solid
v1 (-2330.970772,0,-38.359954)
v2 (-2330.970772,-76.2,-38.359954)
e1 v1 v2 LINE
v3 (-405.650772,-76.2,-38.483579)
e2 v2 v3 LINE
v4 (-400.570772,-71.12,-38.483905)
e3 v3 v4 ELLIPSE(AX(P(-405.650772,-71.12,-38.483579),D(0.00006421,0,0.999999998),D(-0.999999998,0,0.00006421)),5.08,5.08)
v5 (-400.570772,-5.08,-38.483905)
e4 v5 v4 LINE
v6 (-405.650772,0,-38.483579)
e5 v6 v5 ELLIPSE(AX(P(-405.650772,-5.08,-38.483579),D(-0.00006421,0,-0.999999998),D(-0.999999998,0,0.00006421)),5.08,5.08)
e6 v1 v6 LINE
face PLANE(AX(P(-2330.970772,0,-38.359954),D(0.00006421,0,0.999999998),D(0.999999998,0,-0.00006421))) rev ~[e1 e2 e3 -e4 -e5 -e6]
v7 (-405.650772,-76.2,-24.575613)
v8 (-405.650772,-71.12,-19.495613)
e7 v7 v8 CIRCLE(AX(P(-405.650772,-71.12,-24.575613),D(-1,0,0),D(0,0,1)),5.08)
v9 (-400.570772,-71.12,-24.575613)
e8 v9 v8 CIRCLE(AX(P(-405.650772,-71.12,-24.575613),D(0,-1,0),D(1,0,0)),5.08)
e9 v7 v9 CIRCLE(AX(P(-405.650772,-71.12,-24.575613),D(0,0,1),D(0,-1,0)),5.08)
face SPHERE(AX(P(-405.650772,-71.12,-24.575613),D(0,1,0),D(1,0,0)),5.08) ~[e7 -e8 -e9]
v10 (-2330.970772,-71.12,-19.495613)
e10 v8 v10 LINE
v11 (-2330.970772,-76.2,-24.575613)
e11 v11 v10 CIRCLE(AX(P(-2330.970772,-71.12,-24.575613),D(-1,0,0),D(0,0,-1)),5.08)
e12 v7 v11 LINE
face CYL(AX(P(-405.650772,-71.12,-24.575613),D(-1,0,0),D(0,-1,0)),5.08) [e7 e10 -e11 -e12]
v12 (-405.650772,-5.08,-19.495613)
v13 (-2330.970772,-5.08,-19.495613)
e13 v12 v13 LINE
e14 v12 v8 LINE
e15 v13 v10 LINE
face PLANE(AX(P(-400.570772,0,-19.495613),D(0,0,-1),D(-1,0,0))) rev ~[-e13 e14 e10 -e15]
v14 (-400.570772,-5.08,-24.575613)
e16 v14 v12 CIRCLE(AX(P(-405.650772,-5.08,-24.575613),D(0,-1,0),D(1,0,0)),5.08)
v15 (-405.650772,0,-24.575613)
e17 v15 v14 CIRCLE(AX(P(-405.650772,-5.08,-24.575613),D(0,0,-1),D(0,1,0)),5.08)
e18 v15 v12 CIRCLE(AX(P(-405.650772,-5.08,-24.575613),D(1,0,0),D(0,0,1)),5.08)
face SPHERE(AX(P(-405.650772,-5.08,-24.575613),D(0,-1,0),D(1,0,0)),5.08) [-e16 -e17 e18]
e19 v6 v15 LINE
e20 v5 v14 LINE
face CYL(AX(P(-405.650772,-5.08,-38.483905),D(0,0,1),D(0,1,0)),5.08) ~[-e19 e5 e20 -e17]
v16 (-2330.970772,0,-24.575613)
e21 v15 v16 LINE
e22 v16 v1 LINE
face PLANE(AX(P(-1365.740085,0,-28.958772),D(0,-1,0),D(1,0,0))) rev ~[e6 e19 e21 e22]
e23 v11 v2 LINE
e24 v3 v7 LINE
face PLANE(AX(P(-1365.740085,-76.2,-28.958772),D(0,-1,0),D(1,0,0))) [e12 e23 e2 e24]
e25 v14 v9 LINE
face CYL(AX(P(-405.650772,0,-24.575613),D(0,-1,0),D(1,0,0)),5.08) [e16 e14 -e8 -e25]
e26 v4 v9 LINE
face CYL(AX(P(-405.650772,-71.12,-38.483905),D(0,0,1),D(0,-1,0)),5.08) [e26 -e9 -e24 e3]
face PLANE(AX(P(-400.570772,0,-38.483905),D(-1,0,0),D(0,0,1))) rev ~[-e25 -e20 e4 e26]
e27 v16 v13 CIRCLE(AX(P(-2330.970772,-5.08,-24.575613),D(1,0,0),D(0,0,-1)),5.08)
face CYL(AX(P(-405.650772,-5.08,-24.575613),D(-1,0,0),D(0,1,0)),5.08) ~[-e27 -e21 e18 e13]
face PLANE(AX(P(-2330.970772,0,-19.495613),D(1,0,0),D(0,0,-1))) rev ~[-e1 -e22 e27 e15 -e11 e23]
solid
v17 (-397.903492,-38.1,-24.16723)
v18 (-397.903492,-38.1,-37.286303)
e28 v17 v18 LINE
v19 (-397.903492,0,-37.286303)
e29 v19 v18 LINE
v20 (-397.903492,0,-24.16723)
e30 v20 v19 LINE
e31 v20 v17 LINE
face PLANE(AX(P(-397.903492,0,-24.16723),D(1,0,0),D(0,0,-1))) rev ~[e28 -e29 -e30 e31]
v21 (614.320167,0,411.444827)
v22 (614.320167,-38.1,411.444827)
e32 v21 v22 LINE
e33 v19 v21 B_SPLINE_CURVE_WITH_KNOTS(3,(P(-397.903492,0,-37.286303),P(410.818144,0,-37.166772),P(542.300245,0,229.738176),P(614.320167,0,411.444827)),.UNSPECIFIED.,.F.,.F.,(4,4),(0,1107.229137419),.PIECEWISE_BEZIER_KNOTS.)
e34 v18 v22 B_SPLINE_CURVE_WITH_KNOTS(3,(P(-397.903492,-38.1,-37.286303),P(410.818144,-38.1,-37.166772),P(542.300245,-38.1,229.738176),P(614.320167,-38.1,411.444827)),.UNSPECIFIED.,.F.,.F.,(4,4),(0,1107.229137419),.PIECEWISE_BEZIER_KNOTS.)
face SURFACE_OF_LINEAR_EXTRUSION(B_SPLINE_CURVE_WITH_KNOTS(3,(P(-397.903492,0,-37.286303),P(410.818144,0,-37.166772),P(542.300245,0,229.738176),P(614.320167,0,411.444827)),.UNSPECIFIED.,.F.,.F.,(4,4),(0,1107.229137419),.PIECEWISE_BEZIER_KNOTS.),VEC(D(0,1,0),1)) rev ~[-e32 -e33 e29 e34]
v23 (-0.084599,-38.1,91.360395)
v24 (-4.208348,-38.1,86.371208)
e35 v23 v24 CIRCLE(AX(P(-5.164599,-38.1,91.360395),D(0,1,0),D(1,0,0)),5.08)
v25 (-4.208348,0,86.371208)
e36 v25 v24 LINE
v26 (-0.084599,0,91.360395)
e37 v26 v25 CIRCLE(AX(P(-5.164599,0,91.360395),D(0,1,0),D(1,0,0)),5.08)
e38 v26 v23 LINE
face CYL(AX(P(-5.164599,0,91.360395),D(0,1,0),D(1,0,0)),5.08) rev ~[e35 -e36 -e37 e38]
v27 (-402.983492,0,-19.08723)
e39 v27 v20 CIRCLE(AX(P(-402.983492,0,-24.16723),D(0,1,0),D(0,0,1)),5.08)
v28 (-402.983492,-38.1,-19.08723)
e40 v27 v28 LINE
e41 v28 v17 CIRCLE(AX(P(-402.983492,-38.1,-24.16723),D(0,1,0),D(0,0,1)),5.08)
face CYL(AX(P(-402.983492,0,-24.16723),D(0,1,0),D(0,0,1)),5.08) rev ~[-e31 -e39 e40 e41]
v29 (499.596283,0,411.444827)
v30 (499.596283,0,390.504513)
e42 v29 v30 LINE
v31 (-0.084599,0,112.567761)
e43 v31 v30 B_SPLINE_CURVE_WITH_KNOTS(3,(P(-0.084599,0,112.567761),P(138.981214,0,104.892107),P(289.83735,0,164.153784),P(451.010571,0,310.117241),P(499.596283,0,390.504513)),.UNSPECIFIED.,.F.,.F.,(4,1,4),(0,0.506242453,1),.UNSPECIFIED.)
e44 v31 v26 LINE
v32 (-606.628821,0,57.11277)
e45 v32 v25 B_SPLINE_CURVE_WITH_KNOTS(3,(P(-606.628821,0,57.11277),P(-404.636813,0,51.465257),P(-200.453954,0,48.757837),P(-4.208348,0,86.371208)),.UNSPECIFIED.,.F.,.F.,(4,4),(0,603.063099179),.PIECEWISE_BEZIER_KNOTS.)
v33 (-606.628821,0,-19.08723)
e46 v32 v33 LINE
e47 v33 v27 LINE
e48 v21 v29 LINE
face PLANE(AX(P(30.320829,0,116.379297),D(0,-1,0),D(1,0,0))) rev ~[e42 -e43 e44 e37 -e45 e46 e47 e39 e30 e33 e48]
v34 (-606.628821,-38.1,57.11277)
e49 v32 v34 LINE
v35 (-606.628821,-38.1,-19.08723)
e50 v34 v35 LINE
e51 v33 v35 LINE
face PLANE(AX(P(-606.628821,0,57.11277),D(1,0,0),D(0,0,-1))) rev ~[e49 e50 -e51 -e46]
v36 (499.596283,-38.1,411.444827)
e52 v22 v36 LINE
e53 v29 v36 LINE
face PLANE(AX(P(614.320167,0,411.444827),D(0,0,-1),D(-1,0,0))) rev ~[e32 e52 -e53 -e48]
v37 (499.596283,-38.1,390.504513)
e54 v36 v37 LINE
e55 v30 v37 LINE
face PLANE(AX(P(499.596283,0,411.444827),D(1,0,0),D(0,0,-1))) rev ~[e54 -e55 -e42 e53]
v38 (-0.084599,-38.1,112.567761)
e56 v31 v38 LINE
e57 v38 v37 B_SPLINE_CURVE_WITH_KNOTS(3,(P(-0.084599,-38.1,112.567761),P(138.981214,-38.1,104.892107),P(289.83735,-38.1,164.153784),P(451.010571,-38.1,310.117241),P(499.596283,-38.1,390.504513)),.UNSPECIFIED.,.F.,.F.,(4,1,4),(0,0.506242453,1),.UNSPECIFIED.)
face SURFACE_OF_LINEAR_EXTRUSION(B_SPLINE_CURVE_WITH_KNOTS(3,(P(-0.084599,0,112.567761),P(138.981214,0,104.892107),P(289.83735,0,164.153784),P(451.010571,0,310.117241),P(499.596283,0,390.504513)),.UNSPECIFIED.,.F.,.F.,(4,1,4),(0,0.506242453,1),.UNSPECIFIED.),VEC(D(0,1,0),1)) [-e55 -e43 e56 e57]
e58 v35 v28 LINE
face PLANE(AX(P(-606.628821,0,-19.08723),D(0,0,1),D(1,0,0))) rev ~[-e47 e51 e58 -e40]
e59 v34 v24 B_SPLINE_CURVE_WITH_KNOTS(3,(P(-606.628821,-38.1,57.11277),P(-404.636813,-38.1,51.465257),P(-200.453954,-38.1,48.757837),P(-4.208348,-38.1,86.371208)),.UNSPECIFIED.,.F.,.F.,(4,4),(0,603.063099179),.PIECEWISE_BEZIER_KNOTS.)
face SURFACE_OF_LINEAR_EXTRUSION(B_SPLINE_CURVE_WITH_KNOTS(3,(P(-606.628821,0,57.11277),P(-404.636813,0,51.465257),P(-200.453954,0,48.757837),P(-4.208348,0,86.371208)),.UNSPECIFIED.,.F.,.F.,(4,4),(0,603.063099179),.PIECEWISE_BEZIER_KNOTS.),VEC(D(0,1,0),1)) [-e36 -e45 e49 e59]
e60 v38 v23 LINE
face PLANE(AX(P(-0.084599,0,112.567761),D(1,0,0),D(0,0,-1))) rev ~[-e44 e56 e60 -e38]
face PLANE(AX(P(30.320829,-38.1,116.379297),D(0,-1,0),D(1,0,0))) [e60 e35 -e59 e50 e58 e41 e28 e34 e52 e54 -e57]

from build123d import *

# Parameters (mm, degrees)
F1_DEPTH = 38.1
F3_DEPTH = 76.2
F4_R     = 5.08
F5_R     = 5.08
F6_R     = 5.08


with BuildPart() as f1:
    # F0 (on Front) → F1 (new body)
    with BuildSketch(Plane.XZ):
        with BuildLine():
            add(Edge.make_bspline(
                [(-397.9034916449, -37.2863032911), (410.8181435335, -37.1667715246), (542.3002453184, 229.7381759582), (614.3201670874, 411.4448271791)],
                knots=[0, 0, 0, 0, 1107.2291374194, 1107.2291374194, 1107.2291374194, 1107.2291374194], degree=3))
            Line((614.3201670874, 411.4448271791), (499.5962828133, 411.4448271791))
            Line((499.5962828133, 411.4448271791), (499.5962828133, 390.5045126412))
            add(Edge.make_bspline(
                [(-0.08459932, 112.5677610649), (138.9812140865, 104.8921065828), (289.8373497184, 164.1537835287), (451.0105705046, 310.1172410619), (499.5962828133, 390.5045126412)],
                knots=[0, 0, 0, 0, 0.5062424529, 1, 1, 1, 1], degree=3))
            Line((-0.08459932, 112.5677610649), (-0.08459932, 91.3603947808))
            ThreePointArc((-0.08459932, 91.3603947808), (-1.2489795154, 88.1239891285), (-4.2083479602, 86.37120814))
            add(Edge.make_bspline(
                [(-606.6288212141, 57.1127695403), (-404.6368126357, 51.4652566588), (-200.4539536083, 48.7578373083), (-4.2083479602, 86.37120814)],
                knots=[0, 0, 0, 0, 603.0630991795, 603.0630991795, 603.0630991795, 603.0630991795], degree=3))
            Line((-606.6288212141, 57.1127695403), (-606.6288212141, -19.0872304597))
            Line((-606.6288212141, -19.0872304597), (-402.9834916449, -19.0872304597))
            ThreePointArc((-402.9834916449, -19.0872304597), (-399.3913891965, -20.5751280112), (-397.9034916449, -24.1672304597))
            Line((-397.9034916449, -24.1672304597), (-397.9034916449, -37.2863032911))
        make_face()
    extrude(amount=F1_DEPTH)


with BuildPart() as f3:
    # F2 (on Front) → F3 (new body)
    with BuildSketch(Plane.XZ):
        Polygon((-2330.9707720995, -38.3599539625), (-400.5707720995, -38.4839051044), (-400.5707720995, -19.4956134433), (-2330.9707720995, -19.4956134433), align=None)
    extrude(amount=F3_DEPTH)

    # F4
    f4_edges = [f3.edges().sort_by_distance(p)[0] for p in [
        (-400.570772, -38.1, -19.495613),
    ]]
    fillet(f4_edges, radius=F4_R)

    # F5
    f5_edges = [f3.edges().sort_by_distance(p)[0] for p in [
        (-1368.310772, -76.2, -19.495613),
    ]]
    fillet(f5_edges, radius=F5_R)

    # F6
    f6_edges = [f3.edges().sort_by_distance(p)[0] for p in [
        (-1368.310772, 0, -19.495613),
    ]]
    fillet(f6_edges, radius=F6_R)


solid = Compound([f1.part, f3.part])
